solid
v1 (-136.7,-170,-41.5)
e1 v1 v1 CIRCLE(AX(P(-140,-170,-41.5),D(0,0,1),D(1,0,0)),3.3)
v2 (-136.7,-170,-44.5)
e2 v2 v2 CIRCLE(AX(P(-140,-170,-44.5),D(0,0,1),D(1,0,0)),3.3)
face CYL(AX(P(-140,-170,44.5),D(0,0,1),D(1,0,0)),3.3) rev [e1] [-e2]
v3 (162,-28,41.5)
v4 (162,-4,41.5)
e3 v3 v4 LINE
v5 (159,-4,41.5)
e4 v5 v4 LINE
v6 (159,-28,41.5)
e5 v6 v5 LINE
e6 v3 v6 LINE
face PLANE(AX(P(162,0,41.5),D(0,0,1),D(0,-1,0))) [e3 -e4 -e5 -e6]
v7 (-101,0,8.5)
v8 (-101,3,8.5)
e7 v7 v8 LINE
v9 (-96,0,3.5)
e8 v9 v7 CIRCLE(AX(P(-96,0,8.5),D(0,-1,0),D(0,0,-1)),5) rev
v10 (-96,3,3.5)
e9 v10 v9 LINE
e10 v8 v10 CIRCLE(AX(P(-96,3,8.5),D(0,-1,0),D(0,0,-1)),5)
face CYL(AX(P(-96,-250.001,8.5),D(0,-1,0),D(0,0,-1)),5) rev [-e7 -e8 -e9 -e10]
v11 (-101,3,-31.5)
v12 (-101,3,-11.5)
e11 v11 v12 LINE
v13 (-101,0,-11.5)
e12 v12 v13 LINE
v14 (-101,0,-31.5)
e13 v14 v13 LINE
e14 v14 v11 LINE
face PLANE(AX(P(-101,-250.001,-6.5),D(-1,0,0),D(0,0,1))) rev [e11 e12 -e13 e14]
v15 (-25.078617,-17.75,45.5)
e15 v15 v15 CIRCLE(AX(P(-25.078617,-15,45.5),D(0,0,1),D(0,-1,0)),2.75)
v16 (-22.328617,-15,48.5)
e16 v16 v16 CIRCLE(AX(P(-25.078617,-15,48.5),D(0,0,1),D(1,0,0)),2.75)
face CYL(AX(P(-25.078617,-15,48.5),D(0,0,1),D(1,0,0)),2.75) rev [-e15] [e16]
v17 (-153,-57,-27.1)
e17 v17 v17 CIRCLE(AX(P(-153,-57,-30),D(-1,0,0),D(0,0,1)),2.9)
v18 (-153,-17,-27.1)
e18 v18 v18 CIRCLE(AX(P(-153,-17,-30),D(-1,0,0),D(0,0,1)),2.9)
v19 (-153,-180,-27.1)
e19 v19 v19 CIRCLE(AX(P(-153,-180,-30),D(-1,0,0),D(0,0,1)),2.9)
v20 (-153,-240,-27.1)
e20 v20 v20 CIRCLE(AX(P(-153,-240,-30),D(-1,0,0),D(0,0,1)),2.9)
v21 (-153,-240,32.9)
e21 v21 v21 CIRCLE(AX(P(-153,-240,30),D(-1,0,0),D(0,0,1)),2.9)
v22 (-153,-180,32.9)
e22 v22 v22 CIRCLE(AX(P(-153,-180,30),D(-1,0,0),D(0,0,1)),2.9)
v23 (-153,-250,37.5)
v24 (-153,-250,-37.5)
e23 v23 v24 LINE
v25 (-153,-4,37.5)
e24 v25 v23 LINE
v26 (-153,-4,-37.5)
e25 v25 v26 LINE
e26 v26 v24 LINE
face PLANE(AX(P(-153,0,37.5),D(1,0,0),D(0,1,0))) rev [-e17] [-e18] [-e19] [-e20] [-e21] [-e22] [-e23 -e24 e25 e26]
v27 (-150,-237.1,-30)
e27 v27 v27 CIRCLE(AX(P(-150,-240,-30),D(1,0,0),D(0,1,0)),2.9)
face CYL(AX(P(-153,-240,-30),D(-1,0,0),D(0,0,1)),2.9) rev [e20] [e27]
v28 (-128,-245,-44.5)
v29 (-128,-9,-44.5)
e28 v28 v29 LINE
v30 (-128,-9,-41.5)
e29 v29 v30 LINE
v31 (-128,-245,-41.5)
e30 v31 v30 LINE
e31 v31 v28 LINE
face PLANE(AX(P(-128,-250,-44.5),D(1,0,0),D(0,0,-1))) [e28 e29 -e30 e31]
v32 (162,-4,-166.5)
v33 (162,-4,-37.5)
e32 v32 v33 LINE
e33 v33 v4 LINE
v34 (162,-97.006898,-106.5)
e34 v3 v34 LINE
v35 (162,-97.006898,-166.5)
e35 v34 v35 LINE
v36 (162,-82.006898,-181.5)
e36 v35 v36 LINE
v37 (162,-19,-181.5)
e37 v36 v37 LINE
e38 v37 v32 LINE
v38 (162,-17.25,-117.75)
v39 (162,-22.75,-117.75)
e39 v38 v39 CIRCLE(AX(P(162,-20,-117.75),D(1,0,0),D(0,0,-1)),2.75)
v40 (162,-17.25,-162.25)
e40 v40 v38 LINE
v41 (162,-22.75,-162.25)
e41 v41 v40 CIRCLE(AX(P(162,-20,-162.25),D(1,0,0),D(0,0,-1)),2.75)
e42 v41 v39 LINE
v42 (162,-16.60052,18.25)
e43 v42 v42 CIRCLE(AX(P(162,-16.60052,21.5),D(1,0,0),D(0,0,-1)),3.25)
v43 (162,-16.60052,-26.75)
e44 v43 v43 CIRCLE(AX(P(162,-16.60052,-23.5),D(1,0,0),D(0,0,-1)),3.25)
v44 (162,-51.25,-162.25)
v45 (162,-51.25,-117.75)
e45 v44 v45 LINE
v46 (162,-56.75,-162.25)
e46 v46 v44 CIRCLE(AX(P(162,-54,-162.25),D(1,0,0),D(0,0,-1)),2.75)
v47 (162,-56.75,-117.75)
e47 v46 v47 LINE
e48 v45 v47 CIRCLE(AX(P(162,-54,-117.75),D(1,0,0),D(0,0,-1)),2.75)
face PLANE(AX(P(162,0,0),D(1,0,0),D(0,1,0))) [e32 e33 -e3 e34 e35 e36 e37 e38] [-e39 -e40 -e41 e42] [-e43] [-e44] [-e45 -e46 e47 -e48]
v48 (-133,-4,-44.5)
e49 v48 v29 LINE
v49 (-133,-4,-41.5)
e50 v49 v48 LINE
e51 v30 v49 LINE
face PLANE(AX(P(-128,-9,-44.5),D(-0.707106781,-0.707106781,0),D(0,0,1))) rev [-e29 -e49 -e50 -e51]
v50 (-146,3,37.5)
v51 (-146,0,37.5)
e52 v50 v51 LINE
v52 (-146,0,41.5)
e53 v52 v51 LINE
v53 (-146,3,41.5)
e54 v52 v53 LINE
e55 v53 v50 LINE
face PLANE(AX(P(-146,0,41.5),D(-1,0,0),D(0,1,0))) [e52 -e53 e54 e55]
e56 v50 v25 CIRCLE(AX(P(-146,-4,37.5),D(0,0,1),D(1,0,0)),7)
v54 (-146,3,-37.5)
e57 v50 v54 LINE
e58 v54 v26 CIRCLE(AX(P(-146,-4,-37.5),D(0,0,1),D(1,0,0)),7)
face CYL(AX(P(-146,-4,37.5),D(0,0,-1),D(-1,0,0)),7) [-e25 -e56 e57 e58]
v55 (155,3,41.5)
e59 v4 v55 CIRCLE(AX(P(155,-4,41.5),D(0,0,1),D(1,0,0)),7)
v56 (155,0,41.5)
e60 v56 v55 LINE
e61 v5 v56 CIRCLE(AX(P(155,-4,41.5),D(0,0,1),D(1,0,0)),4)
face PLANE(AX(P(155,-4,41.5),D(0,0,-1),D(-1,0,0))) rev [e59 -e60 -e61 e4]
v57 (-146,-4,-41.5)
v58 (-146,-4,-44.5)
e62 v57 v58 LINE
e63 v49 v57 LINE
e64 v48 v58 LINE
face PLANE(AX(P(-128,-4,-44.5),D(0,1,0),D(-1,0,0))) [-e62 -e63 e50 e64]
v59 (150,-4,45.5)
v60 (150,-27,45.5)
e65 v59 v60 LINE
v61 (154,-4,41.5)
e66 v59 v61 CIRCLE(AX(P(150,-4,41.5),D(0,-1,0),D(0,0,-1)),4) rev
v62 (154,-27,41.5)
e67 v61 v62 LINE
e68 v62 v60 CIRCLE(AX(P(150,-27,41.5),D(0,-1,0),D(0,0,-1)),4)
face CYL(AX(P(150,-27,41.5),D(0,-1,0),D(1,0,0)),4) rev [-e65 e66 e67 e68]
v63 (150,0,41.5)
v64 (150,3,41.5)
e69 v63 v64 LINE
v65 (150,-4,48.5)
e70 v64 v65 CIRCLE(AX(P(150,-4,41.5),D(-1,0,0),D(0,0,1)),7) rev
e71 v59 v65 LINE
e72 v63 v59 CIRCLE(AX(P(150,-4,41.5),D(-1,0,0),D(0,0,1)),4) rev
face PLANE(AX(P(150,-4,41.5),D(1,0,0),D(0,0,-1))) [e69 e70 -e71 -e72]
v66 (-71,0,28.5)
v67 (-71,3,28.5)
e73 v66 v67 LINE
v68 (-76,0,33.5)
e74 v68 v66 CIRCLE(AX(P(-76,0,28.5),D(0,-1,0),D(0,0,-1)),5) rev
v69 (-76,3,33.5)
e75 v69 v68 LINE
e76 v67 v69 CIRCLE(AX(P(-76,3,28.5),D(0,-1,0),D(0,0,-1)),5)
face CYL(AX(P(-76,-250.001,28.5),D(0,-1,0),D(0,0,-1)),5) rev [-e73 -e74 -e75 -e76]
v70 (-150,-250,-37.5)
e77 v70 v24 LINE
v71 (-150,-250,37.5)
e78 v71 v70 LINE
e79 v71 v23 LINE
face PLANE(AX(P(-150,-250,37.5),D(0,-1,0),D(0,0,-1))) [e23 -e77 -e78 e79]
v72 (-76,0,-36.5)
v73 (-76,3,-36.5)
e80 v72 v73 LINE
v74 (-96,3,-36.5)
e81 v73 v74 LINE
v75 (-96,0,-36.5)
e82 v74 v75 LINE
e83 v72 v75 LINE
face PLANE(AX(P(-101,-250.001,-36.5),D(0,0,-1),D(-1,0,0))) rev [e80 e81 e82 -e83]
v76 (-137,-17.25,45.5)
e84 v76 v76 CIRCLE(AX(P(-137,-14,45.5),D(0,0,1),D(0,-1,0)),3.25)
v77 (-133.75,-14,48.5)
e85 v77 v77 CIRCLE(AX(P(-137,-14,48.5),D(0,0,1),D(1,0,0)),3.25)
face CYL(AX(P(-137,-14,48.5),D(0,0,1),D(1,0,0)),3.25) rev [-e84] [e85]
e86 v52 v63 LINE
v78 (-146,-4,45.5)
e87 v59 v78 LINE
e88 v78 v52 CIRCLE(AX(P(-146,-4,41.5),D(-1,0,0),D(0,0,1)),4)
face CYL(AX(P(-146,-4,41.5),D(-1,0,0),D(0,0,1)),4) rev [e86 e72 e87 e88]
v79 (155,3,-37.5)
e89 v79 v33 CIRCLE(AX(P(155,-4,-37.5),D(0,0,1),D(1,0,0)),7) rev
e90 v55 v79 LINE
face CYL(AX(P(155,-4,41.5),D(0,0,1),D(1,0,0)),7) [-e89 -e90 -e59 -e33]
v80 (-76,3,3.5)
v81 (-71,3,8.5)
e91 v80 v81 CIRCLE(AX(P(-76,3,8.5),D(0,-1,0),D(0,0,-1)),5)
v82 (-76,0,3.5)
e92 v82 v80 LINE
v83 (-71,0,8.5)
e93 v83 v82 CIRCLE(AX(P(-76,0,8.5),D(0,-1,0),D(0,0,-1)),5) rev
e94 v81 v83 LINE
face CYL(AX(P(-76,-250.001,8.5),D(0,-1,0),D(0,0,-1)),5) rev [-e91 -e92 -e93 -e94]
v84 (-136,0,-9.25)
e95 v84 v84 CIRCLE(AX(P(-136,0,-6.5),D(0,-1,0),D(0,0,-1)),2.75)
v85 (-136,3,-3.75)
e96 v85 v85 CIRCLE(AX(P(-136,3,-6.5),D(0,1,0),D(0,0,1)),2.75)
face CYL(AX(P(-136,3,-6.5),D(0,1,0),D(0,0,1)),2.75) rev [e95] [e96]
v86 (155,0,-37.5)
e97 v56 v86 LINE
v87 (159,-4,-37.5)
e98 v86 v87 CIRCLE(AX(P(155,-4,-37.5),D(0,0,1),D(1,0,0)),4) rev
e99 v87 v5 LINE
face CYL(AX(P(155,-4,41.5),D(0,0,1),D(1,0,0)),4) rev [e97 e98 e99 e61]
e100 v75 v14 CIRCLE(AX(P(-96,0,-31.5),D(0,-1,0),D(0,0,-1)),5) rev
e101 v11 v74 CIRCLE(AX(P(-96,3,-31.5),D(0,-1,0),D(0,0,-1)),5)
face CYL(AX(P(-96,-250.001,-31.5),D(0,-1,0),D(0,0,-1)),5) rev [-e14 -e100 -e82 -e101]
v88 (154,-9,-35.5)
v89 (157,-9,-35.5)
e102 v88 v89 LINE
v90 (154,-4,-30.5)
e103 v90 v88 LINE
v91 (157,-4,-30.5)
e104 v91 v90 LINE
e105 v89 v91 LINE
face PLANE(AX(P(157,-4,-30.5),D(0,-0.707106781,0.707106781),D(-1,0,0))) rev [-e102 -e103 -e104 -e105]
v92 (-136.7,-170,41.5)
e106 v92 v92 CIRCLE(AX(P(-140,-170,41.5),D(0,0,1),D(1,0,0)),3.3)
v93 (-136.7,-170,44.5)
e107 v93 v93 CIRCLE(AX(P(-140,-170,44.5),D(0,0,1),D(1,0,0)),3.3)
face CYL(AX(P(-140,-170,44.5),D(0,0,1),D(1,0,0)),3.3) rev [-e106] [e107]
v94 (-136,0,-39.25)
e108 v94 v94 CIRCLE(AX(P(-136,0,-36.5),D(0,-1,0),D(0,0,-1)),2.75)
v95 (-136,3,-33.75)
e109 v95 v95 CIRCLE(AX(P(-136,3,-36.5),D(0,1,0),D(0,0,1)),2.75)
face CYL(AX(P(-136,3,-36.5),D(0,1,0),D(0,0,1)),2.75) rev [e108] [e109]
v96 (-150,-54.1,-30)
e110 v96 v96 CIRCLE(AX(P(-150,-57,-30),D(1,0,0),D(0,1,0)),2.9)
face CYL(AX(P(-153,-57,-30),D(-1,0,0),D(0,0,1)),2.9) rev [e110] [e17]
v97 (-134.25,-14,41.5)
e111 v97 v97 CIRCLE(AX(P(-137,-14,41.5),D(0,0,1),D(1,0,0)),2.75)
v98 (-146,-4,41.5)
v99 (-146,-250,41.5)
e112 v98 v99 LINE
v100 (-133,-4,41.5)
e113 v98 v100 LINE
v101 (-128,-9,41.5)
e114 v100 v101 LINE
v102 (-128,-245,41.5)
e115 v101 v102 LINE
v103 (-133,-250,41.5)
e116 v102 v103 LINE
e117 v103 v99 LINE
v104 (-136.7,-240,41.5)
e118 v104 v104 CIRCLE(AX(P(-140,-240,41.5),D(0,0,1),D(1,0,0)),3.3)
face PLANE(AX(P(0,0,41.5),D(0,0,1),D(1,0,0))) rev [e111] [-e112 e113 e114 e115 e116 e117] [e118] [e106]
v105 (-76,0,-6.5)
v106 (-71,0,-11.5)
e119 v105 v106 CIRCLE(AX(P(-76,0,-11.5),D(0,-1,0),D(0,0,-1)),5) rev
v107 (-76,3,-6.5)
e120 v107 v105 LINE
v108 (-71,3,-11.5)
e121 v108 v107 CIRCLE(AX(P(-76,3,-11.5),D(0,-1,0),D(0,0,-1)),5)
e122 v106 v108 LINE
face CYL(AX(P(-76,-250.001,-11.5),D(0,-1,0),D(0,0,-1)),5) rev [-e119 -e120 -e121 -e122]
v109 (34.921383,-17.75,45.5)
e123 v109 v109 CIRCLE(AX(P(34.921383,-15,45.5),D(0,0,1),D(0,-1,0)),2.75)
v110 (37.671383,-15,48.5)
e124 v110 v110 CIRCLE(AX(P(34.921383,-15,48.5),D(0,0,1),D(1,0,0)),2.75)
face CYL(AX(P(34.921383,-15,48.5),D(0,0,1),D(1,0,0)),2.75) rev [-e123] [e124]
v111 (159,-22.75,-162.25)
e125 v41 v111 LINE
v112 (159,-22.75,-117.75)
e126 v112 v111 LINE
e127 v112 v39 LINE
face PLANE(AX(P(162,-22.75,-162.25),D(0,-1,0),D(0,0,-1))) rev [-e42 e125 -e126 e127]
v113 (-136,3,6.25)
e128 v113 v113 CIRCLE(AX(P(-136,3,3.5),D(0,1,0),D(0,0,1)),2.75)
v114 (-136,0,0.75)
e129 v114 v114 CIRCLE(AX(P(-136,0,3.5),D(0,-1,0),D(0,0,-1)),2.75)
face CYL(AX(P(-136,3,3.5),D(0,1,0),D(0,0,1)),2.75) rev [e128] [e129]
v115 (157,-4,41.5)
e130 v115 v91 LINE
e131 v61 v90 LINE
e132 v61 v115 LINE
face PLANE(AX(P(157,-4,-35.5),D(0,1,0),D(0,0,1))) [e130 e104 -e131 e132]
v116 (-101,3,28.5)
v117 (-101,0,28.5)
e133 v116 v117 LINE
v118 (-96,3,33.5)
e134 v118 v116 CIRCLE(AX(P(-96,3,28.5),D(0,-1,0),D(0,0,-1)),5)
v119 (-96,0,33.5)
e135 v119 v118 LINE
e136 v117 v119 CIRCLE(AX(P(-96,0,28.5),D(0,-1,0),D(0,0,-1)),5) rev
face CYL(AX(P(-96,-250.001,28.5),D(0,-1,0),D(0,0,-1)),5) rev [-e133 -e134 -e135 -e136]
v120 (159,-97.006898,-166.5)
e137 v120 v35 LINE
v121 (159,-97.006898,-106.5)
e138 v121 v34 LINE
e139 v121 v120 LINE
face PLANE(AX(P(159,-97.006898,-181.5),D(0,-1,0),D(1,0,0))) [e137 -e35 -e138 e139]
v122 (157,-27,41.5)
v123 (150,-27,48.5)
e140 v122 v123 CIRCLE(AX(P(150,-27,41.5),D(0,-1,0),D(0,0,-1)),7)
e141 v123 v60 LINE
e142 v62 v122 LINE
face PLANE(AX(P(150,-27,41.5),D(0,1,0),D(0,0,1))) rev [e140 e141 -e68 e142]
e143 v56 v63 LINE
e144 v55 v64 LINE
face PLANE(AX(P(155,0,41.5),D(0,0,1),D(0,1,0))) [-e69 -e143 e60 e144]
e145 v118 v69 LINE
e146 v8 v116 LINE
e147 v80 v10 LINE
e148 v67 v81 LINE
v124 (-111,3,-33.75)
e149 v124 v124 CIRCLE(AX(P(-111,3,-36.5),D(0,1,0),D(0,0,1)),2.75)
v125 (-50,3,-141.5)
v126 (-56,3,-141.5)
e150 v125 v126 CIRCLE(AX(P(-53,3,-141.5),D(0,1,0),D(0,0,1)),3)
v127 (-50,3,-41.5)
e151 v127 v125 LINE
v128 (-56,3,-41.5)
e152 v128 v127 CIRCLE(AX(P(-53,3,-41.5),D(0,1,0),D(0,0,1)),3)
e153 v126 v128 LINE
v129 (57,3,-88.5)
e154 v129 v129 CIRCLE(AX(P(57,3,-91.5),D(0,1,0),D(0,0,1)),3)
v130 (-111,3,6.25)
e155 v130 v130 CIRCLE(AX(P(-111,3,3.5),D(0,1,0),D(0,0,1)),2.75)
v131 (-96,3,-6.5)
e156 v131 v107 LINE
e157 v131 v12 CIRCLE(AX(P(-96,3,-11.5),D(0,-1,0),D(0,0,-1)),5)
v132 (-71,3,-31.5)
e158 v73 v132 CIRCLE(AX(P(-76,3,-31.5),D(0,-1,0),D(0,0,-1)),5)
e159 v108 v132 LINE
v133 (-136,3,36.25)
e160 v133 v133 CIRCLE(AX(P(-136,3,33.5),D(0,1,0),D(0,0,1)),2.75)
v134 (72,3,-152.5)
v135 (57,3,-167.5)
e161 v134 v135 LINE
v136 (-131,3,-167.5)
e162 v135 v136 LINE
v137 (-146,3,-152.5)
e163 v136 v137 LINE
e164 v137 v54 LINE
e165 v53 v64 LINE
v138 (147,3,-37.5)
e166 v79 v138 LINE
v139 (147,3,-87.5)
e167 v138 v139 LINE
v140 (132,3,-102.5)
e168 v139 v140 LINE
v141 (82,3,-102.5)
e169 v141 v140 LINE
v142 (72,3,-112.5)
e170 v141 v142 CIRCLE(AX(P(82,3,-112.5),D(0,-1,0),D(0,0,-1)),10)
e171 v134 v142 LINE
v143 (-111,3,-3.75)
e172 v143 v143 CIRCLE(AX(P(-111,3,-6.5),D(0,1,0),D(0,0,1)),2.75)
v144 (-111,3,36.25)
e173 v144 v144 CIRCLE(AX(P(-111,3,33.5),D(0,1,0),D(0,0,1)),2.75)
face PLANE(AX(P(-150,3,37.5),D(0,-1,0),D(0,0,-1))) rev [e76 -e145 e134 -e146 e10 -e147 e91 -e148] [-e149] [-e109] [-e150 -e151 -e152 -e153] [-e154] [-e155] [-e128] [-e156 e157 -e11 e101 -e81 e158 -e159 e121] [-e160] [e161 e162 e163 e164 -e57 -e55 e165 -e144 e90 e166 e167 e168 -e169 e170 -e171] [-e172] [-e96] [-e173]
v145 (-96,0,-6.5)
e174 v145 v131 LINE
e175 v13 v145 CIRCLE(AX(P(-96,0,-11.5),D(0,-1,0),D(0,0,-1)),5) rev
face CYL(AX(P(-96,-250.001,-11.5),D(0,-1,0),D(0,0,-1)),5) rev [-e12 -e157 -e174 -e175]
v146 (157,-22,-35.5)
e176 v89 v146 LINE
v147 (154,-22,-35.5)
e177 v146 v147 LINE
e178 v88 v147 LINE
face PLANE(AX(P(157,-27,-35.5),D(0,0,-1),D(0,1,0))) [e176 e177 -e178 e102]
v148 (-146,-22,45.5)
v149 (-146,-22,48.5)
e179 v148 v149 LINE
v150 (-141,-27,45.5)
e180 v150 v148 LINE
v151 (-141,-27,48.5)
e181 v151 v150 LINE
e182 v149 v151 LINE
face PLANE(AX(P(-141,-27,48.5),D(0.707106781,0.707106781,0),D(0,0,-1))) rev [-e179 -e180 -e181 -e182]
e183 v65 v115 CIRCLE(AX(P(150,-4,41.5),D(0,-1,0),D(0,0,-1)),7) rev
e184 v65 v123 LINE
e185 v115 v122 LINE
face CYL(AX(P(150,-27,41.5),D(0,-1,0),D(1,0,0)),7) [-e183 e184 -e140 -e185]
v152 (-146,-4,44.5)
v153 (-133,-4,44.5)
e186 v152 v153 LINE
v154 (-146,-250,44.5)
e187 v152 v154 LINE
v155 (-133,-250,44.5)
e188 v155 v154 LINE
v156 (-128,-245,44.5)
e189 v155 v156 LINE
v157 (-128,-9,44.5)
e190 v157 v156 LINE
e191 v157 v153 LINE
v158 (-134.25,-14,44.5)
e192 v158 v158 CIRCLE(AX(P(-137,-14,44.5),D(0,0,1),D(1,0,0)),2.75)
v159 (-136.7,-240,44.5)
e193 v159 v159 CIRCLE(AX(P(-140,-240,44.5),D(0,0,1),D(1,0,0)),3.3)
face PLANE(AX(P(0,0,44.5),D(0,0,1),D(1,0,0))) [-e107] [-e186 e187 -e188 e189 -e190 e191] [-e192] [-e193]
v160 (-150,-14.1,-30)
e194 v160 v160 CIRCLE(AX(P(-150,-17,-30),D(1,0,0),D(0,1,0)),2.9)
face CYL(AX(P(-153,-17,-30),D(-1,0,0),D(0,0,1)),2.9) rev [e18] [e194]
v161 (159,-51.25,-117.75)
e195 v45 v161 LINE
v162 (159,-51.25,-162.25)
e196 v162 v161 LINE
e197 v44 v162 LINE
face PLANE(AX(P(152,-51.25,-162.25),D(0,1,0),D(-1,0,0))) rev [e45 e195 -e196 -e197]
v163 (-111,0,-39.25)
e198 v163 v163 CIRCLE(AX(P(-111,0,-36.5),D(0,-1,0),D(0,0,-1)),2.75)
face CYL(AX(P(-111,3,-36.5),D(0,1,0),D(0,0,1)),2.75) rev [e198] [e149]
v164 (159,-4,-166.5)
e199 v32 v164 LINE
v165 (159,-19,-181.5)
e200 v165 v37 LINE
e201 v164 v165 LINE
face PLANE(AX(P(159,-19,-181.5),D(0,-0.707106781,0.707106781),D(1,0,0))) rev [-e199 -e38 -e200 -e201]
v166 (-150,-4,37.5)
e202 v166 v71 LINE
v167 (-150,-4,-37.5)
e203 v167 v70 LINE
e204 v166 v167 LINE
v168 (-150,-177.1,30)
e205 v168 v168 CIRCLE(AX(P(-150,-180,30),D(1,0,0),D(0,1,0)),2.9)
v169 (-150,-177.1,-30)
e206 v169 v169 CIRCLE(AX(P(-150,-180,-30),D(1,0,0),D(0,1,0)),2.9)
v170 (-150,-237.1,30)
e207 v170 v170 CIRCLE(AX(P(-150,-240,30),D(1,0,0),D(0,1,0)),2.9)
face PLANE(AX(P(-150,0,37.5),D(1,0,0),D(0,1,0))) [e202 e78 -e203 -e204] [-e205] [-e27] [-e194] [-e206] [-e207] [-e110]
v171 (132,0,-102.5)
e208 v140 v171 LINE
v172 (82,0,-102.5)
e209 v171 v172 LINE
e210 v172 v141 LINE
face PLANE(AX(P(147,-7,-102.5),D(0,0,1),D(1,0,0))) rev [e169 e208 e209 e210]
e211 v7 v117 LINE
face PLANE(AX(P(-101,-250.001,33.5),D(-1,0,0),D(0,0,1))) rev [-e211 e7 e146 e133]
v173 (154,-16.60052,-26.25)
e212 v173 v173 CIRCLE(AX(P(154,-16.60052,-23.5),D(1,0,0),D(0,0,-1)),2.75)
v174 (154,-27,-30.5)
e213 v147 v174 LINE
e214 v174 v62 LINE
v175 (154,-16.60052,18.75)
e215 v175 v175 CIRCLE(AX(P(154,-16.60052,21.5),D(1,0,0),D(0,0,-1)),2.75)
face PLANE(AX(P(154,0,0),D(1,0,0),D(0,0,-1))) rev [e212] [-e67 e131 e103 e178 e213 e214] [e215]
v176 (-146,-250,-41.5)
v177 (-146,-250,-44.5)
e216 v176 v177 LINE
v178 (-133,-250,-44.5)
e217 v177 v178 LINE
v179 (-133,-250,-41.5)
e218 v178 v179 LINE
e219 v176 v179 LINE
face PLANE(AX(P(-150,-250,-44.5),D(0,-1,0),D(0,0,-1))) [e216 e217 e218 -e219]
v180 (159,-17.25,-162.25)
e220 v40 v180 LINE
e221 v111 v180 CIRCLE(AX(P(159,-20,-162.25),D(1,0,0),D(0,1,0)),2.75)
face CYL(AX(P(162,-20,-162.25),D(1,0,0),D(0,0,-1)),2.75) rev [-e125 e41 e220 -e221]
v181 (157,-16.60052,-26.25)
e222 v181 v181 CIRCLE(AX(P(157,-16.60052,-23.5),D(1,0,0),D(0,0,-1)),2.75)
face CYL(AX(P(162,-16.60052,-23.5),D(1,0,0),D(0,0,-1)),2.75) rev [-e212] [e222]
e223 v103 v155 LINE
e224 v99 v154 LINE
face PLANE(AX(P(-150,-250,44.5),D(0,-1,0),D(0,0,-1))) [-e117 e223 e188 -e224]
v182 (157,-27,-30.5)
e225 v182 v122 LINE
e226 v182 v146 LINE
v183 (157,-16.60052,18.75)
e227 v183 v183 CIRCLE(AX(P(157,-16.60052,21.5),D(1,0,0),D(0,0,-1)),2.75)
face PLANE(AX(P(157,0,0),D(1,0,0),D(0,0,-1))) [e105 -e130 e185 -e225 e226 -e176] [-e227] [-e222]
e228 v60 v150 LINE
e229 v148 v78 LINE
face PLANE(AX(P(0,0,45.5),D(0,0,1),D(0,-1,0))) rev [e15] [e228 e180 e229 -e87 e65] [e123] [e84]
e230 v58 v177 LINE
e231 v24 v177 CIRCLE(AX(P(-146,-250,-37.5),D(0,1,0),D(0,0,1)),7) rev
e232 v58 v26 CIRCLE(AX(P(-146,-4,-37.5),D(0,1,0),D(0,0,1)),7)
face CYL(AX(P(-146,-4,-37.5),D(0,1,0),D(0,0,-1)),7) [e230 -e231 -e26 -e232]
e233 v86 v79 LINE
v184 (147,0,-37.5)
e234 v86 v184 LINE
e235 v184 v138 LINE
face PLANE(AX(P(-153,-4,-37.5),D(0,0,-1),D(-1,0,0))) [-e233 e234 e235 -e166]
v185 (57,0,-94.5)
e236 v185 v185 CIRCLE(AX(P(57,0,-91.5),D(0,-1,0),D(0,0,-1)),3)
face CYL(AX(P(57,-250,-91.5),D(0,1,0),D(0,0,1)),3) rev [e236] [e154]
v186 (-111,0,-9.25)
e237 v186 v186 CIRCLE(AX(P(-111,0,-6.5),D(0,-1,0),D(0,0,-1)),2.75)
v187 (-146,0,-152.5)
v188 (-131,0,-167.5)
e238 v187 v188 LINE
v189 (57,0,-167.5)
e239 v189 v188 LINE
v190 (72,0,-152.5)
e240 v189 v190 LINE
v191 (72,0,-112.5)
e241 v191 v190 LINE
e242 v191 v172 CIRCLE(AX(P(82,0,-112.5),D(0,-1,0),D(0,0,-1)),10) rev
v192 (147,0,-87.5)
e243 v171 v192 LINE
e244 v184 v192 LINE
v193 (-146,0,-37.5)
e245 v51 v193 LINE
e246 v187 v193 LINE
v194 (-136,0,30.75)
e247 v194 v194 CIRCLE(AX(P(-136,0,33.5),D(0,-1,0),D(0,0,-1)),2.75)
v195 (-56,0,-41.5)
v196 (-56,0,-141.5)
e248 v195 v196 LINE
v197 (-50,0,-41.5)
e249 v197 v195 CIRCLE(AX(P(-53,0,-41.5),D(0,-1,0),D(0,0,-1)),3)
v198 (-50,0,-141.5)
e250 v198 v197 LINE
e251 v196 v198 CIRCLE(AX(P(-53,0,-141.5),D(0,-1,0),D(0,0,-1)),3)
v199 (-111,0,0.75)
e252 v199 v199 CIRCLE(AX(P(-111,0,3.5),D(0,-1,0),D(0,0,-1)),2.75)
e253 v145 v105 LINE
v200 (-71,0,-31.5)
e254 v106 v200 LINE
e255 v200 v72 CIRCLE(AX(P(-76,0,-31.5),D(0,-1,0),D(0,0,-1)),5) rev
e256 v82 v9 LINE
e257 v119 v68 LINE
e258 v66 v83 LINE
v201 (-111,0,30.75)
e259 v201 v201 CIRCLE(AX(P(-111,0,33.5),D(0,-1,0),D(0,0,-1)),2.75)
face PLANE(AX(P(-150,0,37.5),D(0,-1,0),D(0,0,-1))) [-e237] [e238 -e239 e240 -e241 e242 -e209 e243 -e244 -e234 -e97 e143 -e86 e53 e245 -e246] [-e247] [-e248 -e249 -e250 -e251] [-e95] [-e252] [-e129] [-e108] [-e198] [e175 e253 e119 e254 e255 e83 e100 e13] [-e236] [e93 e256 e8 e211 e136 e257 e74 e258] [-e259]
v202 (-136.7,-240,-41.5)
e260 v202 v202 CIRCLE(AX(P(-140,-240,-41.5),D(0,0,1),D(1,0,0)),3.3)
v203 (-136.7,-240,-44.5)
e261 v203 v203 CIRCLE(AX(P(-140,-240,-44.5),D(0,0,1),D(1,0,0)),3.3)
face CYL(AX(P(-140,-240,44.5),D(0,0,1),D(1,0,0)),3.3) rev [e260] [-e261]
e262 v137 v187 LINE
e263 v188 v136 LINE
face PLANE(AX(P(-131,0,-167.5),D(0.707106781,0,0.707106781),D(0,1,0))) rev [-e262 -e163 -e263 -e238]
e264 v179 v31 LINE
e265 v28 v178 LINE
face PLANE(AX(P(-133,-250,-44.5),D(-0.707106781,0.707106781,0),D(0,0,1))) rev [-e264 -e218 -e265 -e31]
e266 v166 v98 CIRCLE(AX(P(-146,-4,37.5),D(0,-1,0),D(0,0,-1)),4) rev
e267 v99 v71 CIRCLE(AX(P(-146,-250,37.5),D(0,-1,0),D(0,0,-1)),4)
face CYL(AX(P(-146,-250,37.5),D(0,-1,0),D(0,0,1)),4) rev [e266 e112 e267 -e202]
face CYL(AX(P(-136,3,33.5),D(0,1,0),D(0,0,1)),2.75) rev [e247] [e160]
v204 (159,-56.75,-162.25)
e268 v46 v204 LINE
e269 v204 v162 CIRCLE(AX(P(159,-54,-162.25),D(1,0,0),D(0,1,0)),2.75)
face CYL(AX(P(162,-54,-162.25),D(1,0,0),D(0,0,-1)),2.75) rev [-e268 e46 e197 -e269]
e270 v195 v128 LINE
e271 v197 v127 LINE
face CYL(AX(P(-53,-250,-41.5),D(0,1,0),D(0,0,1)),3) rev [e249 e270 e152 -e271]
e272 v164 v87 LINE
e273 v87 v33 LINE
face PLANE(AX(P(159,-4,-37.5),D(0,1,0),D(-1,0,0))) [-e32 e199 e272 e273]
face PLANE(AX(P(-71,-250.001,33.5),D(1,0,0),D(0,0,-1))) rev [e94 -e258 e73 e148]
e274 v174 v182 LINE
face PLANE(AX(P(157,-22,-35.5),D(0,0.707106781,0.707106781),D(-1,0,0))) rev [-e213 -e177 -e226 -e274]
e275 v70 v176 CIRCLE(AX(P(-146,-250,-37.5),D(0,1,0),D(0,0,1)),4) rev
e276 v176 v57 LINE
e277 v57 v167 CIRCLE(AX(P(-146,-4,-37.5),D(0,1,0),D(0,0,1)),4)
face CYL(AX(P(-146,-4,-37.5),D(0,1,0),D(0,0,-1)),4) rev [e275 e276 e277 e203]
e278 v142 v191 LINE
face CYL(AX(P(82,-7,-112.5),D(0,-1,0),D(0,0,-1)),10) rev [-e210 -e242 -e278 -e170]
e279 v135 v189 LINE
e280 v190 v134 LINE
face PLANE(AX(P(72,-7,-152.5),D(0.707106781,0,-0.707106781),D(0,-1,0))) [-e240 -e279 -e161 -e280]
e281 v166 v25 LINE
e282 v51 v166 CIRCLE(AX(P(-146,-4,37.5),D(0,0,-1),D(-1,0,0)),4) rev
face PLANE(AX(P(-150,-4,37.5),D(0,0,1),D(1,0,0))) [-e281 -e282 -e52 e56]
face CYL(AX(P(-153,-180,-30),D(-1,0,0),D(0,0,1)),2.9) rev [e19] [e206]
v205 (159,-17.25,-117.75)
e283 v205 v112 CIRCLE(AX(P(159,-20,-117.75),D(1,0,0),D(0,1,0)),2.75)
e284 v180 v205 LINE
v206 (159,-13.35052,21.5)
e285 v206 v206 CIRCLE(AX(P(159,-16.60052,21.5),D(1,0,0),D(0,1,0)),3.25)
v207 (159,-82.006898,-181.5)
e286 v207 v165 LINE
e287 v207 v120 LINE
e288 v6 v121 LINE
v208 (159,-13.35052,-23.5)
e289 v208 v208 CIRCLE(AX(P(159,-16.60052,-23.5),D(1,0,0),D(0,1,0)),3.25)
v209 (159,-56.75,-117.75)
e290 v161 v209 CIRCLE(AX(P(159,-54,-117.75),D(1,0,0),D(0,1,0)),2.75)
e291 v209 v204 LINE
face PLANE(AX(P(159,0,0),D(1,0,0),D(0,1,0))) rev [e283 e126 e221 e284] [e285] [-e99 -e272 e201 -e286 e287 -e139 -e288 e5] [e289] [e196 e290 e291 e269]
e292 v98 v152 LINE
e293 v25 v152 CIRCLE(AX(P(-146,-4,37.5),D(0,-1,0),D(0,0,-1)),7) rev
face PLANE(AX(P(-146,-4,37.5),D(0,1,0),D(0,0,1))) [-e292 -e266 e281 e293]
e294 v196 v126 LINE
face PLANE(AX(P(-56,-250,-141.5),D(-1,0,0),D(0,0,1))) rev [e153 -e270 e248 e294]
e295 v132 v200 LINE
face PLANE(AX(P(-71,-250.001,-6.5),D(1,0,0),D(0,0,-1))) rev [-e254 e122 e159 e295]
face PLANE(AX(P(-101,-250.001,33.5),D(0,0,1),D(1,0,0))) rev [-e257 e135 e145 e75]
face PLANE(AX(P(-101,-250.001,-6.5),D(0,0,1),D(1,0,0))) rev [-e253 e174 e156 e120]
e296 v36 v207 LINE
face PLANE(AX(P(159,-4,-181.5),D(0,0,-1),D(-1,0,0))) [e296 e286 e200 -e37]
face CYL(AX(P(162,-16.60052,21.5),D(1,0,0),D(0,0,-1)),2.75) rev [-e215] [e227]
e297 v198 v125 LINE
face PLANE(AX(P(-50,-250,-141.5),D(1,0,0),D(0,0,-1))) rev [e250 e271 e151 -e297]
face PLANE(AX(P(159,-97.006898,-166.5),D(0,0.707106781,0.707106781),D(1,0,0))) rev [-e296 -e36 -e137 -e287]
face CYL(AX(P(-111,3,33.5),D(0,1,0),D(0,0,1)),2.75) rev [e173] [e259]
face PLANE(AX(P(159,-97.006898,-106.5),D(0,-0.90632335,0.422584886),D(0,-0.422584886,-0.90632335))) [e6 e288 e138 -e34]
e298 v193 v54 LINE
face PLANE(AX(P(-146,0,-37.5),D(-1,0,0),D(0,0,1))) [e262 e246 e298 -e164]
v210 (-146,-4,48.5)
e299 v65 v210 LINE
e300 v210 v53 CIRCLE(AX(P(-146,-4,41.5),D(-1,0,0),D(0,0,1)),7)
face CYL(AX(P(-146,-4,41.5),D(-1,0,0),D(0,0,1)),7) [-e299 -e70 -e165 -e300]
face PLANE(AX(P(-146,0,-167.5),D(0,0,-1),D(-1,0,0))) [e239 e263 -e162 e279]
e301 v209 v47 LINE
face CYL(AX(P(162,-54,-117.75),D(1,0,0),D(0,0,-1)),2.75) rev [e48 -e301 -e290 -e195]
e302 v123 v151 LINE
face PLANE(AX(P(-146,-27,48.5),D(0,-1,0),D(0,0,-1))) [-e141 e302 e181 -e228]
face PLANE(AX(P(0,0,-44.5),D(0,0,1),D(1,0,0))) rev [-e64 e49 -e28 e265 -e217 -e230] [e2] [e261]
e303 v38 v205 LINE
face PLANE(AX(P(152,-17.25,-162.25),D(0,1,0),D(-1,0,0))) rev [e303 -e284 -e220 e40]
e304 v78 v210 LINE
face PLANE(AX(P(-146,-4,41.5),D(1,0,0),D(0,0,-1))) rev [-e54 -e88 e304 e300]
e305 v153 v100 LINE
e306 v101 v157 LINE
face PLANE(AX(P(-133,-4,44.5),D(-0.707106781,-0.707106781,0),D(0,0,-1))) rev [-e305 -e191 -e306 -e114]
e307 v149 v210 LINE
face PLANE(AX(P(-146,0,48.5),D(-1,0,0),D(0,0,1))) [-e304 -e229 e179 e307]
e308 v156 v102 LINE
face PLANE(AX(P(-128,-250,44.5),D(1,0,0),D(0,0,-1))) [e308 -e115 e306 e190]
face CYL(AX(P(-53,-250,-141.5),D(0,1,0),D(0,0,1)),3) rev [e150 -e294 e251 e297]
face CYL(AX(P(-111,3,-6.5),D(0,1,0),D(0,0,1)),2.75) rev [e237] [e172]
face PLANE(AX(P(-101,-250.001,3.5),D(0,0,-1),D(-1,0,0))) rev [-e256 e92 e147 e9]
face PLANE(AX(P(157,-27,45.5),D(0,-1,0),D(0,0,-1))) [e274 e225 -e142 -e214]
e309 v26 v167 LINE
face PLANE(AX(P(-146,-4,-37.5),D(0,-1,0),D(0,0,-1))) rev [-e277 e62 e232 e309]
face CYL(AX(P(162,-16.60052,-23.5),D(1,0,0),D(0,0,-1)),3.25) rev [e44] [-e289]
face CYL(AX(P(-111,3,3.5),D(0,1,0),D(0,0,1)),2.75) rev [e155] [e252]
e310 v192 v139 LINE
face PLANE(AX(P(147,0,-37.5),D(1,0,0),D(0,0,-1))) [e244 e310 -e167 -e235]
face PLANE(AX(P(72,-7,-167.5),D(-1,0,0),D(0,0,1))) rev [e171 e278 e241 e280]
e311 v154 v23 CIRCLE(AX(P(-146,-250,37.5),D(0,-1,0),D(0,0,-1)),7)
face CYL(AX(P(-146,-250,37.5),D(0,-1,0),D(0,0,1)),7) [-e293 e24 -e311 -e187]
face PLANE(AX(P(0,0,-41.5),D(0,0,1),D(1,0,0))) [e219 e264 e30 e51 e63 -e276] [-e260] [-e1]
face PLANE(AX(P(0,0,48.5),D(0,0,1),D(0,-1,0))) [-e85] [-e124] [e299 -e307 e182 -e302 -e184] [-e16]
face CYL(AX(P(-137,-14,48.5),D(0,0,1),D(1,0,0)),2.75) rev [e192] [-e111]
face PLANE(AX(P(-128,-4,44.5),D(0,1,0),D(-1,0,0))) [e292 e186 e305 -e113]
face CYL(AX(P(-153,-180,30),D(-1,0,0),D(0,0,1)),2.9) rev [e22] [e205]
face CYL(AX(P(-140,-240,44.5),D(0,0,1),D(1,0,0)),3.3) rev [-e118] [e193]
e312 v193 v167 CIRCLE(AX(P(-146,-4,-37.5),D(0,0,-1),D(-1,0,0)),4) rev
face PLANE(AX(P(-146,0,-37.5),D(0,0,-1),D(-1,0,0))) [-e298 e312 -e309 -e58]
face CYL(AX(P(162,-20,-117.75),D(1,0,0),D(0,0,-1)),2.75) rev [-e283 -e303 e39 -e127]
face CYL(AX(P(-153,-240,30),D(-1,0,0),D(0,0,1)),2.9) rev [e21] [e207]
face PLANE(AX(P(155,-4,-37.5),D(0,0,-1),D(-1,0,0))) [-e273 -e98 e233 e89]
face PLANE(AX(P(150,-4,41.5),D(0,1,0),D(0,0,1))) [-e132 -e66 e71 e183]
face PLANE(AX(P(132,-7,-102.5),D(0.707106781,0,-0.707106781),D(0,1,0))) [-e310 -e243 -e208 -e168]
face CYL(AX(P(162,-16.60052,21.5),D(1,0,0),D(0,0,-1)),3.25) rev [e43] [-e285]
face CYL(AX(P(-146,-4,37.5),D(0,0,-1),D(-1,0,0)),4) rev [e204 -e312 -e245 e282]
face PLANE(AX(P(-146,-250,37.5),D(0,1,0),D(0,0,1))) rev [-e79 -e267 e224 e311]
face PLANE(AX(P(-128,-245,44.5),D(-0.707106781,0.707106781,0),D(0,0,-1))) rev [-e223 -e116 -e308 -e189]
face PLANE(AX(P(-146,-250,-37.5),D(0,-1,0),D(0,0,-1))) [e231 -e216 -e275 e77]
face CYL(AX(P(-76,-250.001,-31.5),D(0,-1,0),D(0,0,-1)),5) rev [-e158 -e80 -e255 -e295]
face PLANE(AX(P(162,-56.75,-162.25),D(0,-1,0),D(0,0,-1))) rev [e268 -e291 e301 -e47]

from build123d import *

# Parameters (mm, degrees)
ODGI_CIE_BAZOWE1_DEPTH                            = 37.5
ODGI_CIE_KRAW_DZI1_DEPTH                          = 296
ODGI_CIE_KRAW_DZI2_DEPTH                          = 246
ODGI_CIE_KRAW_DZI2_BEND_DEPTH                     = 246
OTW_R_POD_RUB_M51_D                               = 5.8
OTW_R_POD_RUB_M51_DEPTH                           = 10
OTW_R_POD_RUB_M51_TIP                             = 1.742495795
OTW_R_POD_RUB_M61_D                               = 6.6
ODGI_CIE_KRAW_DZI3_DEPTH                          = 79
SZKIC38_W                                         = 293
SZKIC38_H                                         = 130
WYPUST1_DEPTH                                     = 3
WYPUST2_DEPTH                                     = 3
ODGI_CIE_KRAW_DZI4_DEPTH                          = 23
SZKIC49_R                                         = 3
WYTNIJ_WYCI_GNI_CIE1_DEPTH                        = 351.991809021
SZCZELINA_START                                   = 159
SZCZELINA_POD_RUB_M53_DEPTH                       = 3
SFAZOWANIE3_SIZE                                  = 5
POG_BIENIE_WALCOWE_POD_M5_RUB_Z_BEM_S_D           = 5.5
POG_BIENIE_WALCOWE_POD_M5_RUB_Z_BEM_S_DEPTH       = 10
POG_BIENIE_WALCOWE_POD_M5_RUB_Z_BEM_S_CBORE_D     = 6.5
POG_BIENIE_WALCOWE_POD_M5_RUB_Z_BEM_S_CBORE_DEPTH = 3.7
POG_BIENIE_WALCOWE_POD_M5_RUB_Z_BEM_S_TIP         = 1.652366702
POG_BIENIE_WALCOWE_POD_M5_RUB_Z_B_2_D             = 5.5
POG_BIENIE_WALCOWE_POD_M5_RUB_Z_B_2_DEPTH         = 10
POG_BIENIE_WALCOWE_POD_M5_RUB_Z_B_2_CBORE_D       = 6.5
POG_BIENIE_WALCOWE_POD_M5_RUB_Z_B_2_CBORE_DEPTH   = 3.7
POG_BIENIE_WALCOWE_POD_M5_RUB_Z_B_2_TIP           = 1.652366702
SZKIC57_W                                         = 75
SZKIC57_H                                         = 65
WYTNIJ_WYCI_GNI_CIE2_DEPTH                        = 10
WYTNIJ_WYCI_GNI_CIE3_REACH                        = 352.992
SZKIC58_W                                         = 30
SZKIC58_H                                         = 30
SZYK_LINIOWY1_COUNT                               = 2
SZYK_LINIOWY1_PITCH                               = 40
SFAZOWANIE4_SIZE                                  = 15
ZAOKR_GLENIE1_R                                   = 10
ZAOKR_GLENIE2_R                                   = 5
OTW_R_POD_RUB_M52_D                               = 5.5
OTW_R_POD_RUB_M52_DEPTH                           = 10
OTW_R_POD_RUB_M52_TIP                             = 1.652366702
OTW_R_POD_RUB_M53_D                               = 5.5
OTW_R_POD_RUB_M53_DEPTH                           = 10
OTW_R_POD_RUB_M53_TIP                             = 1.652366702


# Read off the part's stored shape, not the designer's step: Szczelina pod śrubę M53
# Sheet-metal steps are written as plain solids
with BuildPart() as part:
    # Szkic1 → Odgięcie bazowe1 (new, symmetric)
    with BuildSketch(Plane.XY):
        with BuildLine():
            Line((-150, -250), (-150, -4))
            ThreePointArc((-150, -4), (-148.828427125, -1.171572875), (-146, 0))
            Line((-146, 0), (150, 0))
            Line((150, 0), (150, 3))
            Line((150, 3), (-146, 3))
            ThreePointArc((-146, 3), (-150.949747468, 0.949747468), (-153, -4))
            Line((-153, -4), (-153, -250))
            Line((-153, -250), (-150, -250))
        make_face()
    extrude(amount=ODGI_CIE_BAZOWE1_DEPTH, both=True)

    # Odgięcie krawędzi1 section (across the edge) → Odgięcie krawędzi1 (add)
    with BuildSketch(Plane(origin=(150, 0, 45.5), x_dir=(0, 0, -1), z_dir=(-1, 0, 0))):
        with BuildLine():
            Line((-3, 4), (-3, 27))
            Line((-3, 27), (0, 27))
            Line((0, 27), (0, 4))
            ThreePointArc((0, 4), (1.171572875, 1.171572875), (4, 0))
            Line((4, 0), (8, 0))
            Line((8, 0), (8, -3))
            Line((8, -3), (4, -3))
            ThreePointArc((4, -3), (-0.949747468, -0.949747468), (-3, 4))
        make_face()
    extrude(amount=ODGI_CIE_KRAW_DZI1_DEPTH)

    # Odgięcie krawędzi2 section (across the edge) → Odgięcie krawędzi2 (add)
    with BuildSketch(Plane(origin=(-150, -4, 41.5), x_dir=(0, 0, -1), z_dir=(0, -1, 0))):
        with BuildLine():
            Line((-3, 4), (-3, 22))
            Line((-3, 22), (0, 22))
            Line((0, 22), (0, 4))
            ThreePointArc((0, 4), (1.171572875, 1.171572875), (4, 0))
            Line((4, 0), (4, -3))
            ThreePointArc((4, -3), (-0.949747468, -0.949747468), (-3, 4))
        make_face()
    extrude(amount=ODGI_CIE_KRAW_DZI2_DEPTH)

    # Odgięcie krawędzi2 section 2 (across the edge) → Odgięcie krawędzi2 bend (add)
    with BuildSketch(Plane(origin=(-150, -250, -41.5), x_dir=(0, 0, 1), z_dir=(0, 1, 0))):
        with BuildLine():
            Line((-3, 4), (-3, 22))
            Line((-3, 22), (0, 22))
            Line((0, 22), (0, 4))
            ThreePointArc((0, 4), (1.171572875, 1.171572875), (4, 0))
            Line((4, 0), (4, -3))
            ThreePointArc((4, -3), (-0.949747468, -0.949747468), (-3, 4))
        make_face()
    extrude(amount=ODGI_CIE_KRAW_DZI2_BEND_DEPTH)

    # Otwór pod śrubę M51
    with Locations(Plane.ZY.offset(153)):
        with Locations((-30, -240), (30, -240), (-30, -180), (30, -180), (-30, -17), (-30, -57)):
            Hole(OTW_R_POD_RUB_M51_D / 2, depth=OTW_R_POD_RUB_M51_DEPTH)
            with Locations((0, 0, -(OTW_R_POD_RUB_M51_DEPTH + OTW_R_POD_RUB_M51_TIP / 2))):  # 118° drill point
                Cone(0, OTW_R_POD_RUB_M51_D / 2, OTW_R_POD_RUB_M51_TIP, mode=Mode.SUBTRACT)

    # Otwór pod śrubę M61 (through all)
    with Locations(Plane.XY.offset(44.5)):
        with Locations((-140, -240), (-140, -170)):
            Hole(OTW_R_POD_RUB_M61_D / 2)

    # Odgięcie krawędzi3 section (across the edge) → Odgięcie krawędzi3 (add)
    with BuildSketch(Plane(origin=(159, 0, -37.5), x_dir=(-1, 0, 0), z_dir=(0, 0, 1))):
        with BuildLine():
            Line((-3, 4), (-3, 28))
            Line((-3, 28), (0, 28))
            Line((0, 28), (0, 4))
            ThreePointArc((0, 4), (1.171572875, 1.171572875), (4, 0))
            Line((4, 0), (9, 0))
            Line((9, 0), (9, -3))
            Line((9, -3), (4, -3))
            ThreePointArc((4, -3), (-0.949747468, -0.949747468), (-3, 4))
        make_face()
    extrude(amount=ODGI_CIE_KRAW_DZI3_DEPTH)

    # Szkic38 → Wypust1 (add)
    with BuildSketch(Plane(origin=(0, 3, 0), x_dir=(1, 0, 0), z_dir=(0, 1, 0))):
        with Locations((0.5, 102.5)):
            Rectangle(SZKIC38_W, SZKIC38_H)
    extrude(amount=-WYPUST1_DEPTH)

    # Szkic41 → Wypust2 (add)
    with BuildSketch(Plane(origin=(162, 0, 0), x_dir=(0, 0, -1), z_dir=(1, 0, 0))):
        Polygon((37.5, -4), (181.5, -4), (181.5, -97.00689818), (106.5, -97.00689818), (-41.5, -28), (37.5, -28), align=None)
    extrude(amount=-WYPUST2_DEPTH)

    # Odgięcie krawędzi4 section (across the edge) → Odgięcie krawędzi4 (add)
    with BuildSketch(Plane(origin=(154, -4, 45.5), x_dir=(-1, 0, 0), z_dir=(0, -1, 0))):
        with BuildLine():
            Line((-3, 4), (-3, 81))
            Line((-3, 81), (0, 81))
            Line((0, 81), (0, 4))
            ThreePointArc((0, 4), (1.171572875, 1.171572875), (4, 0))
            Line((4, 0), (4, -3))
            ThreePointArc((4, -3), (-0.949747468, -0.949747468), (-3, 4))
        make_face()
    extrude(amount=ODGI_CIE_KRAW_DZI4_DEPTH)

    # Szkic49 → Wytnij-wyciągnięcie1 (cut, through all)
    with BuildSketch(Plane(origin=(0, 3, 0), x_dir=(1, 0, 0), z_dir=(0, 1, 0))):
        with Locations(Location((57, 91.5, 0), (0, 0, 270))):
            Circle(SZKIC49_R)
        with BuildLine():
            Line((-50, 141.5), (-50, 41.5))
            ThreePointArc((-50, 41.5), (-53, 38.5), (-56, 41.5))
            Line((-56, 41.5), (-56, 141.5))
            ThreePointArc((-56, 141.5), (-53, 144.5), (-50, 141.5))
        make_face()
    extrude(amount=-WYTNIJ_WYCI_GNI_CIE1_DEPTH, mode=Mode.SUBTRACT)

    # Szczelina pod śrubę M53 outline → Szczelina pod śrubę M53 (cut)
    with BuildSketch(Plane.YZ.offset(SZCZELINA_START)):
        with BuildLine():
            Line((-56.75, -117.75), (-56.75, -162.25))
            ThreePointArc((-56.75, -162.25), (-54, -165), (-51.25, -162.25))
            Line((-51.25, -162.25), (-51.25, -117.75))
            ThreePointArc((-51.25, -117.75), (-54, -115), (-56.75, -117.75))
        make_face()
        with BuildLine():
            ThreePointArc((-22.75, -162.25), (-20, -165), (-17.25, -162.25))
            Line((-17.25, -162.25), (-17.25, -117.75))
            ThreePointArc((-17.25, -117.75), (-20, -115), (-22.75, -117.75))
            Line((-22.75, -117.75), (-22.75, -162.25))
        make_face()
    extrude(amount=SZCZELINA_POD_RUB_M53_DEPTH, mode=Mode.SUBTRACT)

    # Sfazowanie3
    sfazowanie3_edges = [part.edges().sort_by_distance(p)[0] for p in [
        (155.5, -4, -35.5),
        (155.5, -27, -35.5),
        (-146, -27, 47),
        (-128, -4, 43),
        (-128, -250, 43),
        (-128, -250, -43),
        (-128, -4, -43),
    ]]
    chamfer(sfazowanie3_edges, length=SFAZOWANIE3_SIZE)

    # Pog_bienie walcowe pod M5 _rub_ z _bem s
    with Locations(Plane.XY.offset(48.5)):
        with Locations((-137, -14)):
            CounterBoreHole(POG_BIENIE_WALCOWE_POD_M5_RUB_Z_BEM_S_D / 2, POG_BIENIE_WALCOWE_POD_M5_RUB_Z_BEM_S_CBORE_D / 2, POG_BIENIE_WALCOWE_POD_M5_RUB_Z_BEM_S_CBORE_DEPTH, depth=POG_BIENIE_WALCOWE_POD_M5_RUB_Z_BEM_S_DEPTH)
            with Locations((0, 0, -(POG_BIENIE_WALCOWE_POD_M5_RUB_Z_BEM_S_DEPTH + POG_BIENIE_WALCOWE_POD_M5_RUB_Z_BEM_S_TIP / 2))):  # 118° drill point
                Cone(0, POG_BIENIE_WALCOWE_POD_M5_RUB_Z_BEM_S_D / 2, POG_BIENIE_WALCOWE_POD_M5_RUB_Z_BEM_S_TIP, mode=Mode.SUBTRACT)

    # Pog_bienie walcowe pod M5 _rub_ z _b 2
    with Locations(Plane(origin=(162, 0, 0), x_dir=(0, 0, -1), z_dir=(1, 0, 0))):
        with Locations((-21.5, -16.600519764), (23.5, -16.600519764)):
            CounterBoreHole(POG_BIENIE_WALCOWE_POD_M5_RUB_Z_B_2_D / 2, POG_BIENIE_WALCOWE_POD_M5_RUB_Z_B_2_CBORE_D / 2, POG_BIENIE_WALCOWE_POD_M5_RUB_Z_B_2_CBORE_DEPTH, depth=POG_BIENIE_WALCOWE_POD_M5_RUB_Z_B_2_DEPTH)
            with Locations((0, 0, -(POG_BIENIE_WALCOWE_POD_M5_RUB_Z_B_2_DEPTH + POG_BIENIE_WALCOWE_POD_M5_RUB_Z_B_2_TIP / 2))):  # 118° drill point
                Cone(0, POG_BIENIE_WALCOWE_POD_M5_RUB_Z_B_2_D / 2, POG_BIENIE_WALCOWE_POD_M5_RUB_Z_B_2_TIP, mode=Mode.SUBTRACT)

    # Szkic57 → Wytnij-wyciągnięcie2 (cut)
    with BuildSketch(Plane(origin=(0, 3, 0), x_dir=(1, 0, 0), z_dir=(0, 1, 0))):
        with Locations((109.5, 135)):
            Rectangle(SZKIC57_W, SZKIC57_H)
    extrude(amount=-WYTNIJ_WYCI_GNI_CIE2_DEPTH, mode=Mode.SUBTRACT)

    # Szkic58 → Wytnij-wyciągnięcie3 (cut, up to next)
    with BuildSketch(Plane(origin=(0, 3, 0), x_dir=(1, 0, 0), z_dir=(0, 1, 0)), mode=Mode.PRIVATE) as wytnij_wyci_gni_cie3_sk1:
        with Locations((-86, -18.5)):
            Rectangle(SZKIC58_W, SZKIC58_H)
    wytnij_wyci_gni_cie3_tool1 = extrude(wytnij_wyci_gni_cie3_sk1.sketch, amount=-WYTNIJ_WYCI_GNI_CIE3_REACH, mode=Mode.PRIVATE) & part.part
    wytnij_wyci_gni_cie3 = wytnij_wyci_gni_cie3_tool1.solids().sort_by_distance((-86, 3, 18.5))[0]
    add(wytnij_wyci_gni_cie3, mode=Mode.SUBTRACT)

    # Szyk liniowy1: Wytnij-wyciągnięcie3 ×2
    with Locations(*[(0, 0, -i * SZYK_LINIOWY1_PITCH) for i in range(1, SZYK_LINIOWY1_COUNT)]):
        add(wytnij_wyci_gni_cie3, mode=Mode.SUBTRACT)

    # Sfazowanie4
    sfazowanie4_edges = [part.edges().sort_by_distance(p)[0] for p in [
        (-146, 1.5, -167.5),
        (160.5, -4, -181.5),
        (160.5, -97.00689818, -181.5),
        (147, 1.5, -102.5),
        (72, 1.5, -167.5),
    ]]
    chamfer(sfazowanie4_edges, length=SFAZOWANIE4_SIZE)

    # Zaokrąglenie1
    zaokr_glenie1_edges = [part.edges().sort_by_distance(p)[0] for p in [
        (72, 1.5, -102.5),
    ]]
    fillet(zaokr_glenie1_edges, radius=ZAOKR_GLENIE1_R)

    # Zaokrąglenie2
    zaokr_glenie2_edges = [part.edges().sort_by_distance(p)[0] for p in [
        (-101, 1.5, 33.5),
        (-101, 1.5, 3.5),
        (-71, 1.5, 3.5),
        (-71, 1.5, 33.5),
        (-101, 1.5, -6.5),
        (-101, 1.5, -36.5),
        (-71, 1.5, -36.5),
        (-71, 1.5, -6.5),
    ]]
    fillet(zaokr_glenie2_edges, radius=ZAOKR_GLENIE2_R)

    # Otwór pod śrubę M52
    with Locations(Plane(origin=(0, 3, 0), x_dir=(1, 0, 0), z_dir=(0, 1, 0))):
        with Locations((-111, 36.5), (-111, -3.5), (-111, 6.5), (-111, -33.5), (-136, 36.5), (-136, -3.5), (-136, 6.5), (-136, -33.5)):
            Hole(OTW_R_POD_RUB_M52_D / 2, depth=OTW_R_POD_RUB_M52_DEPTH)
            with Locations((0, 0, -(OTW_R_POD_RUB_M52_DEPTH + OTW_R_POD_RUB_M52_TIP / 2))):  # 118° drill point
                Cone(0, OTW_R_POD_RUB_M52_D / 2, OTW_R_POD_RUB_M52_TIP, mode=Mode.SUBTRACT)

    # Otwór pod śrubę M53
    with Locations(Plane.XY.offset(48.5)):
        with Locations((-25.078617212, -15), (34.921382788, -15)):
            Hole(OTW_R_POD_RUB_M53_D / 2, depth=OTW_R_POD_RUB_M53_DEPTH)
            with Locations((0, 0, -(OTW_R_POD_RUB_M53_DEPTH + OTW_R_POD_RUB_M53_TIP / 2))):  # 118° drill point
                Cone(0, OTW_R_POD_RUB_M53_D / 2, OTW_R_POD_RUB_M53_TIP, mode=Mode.SUBTRACT)


solid = part.part
